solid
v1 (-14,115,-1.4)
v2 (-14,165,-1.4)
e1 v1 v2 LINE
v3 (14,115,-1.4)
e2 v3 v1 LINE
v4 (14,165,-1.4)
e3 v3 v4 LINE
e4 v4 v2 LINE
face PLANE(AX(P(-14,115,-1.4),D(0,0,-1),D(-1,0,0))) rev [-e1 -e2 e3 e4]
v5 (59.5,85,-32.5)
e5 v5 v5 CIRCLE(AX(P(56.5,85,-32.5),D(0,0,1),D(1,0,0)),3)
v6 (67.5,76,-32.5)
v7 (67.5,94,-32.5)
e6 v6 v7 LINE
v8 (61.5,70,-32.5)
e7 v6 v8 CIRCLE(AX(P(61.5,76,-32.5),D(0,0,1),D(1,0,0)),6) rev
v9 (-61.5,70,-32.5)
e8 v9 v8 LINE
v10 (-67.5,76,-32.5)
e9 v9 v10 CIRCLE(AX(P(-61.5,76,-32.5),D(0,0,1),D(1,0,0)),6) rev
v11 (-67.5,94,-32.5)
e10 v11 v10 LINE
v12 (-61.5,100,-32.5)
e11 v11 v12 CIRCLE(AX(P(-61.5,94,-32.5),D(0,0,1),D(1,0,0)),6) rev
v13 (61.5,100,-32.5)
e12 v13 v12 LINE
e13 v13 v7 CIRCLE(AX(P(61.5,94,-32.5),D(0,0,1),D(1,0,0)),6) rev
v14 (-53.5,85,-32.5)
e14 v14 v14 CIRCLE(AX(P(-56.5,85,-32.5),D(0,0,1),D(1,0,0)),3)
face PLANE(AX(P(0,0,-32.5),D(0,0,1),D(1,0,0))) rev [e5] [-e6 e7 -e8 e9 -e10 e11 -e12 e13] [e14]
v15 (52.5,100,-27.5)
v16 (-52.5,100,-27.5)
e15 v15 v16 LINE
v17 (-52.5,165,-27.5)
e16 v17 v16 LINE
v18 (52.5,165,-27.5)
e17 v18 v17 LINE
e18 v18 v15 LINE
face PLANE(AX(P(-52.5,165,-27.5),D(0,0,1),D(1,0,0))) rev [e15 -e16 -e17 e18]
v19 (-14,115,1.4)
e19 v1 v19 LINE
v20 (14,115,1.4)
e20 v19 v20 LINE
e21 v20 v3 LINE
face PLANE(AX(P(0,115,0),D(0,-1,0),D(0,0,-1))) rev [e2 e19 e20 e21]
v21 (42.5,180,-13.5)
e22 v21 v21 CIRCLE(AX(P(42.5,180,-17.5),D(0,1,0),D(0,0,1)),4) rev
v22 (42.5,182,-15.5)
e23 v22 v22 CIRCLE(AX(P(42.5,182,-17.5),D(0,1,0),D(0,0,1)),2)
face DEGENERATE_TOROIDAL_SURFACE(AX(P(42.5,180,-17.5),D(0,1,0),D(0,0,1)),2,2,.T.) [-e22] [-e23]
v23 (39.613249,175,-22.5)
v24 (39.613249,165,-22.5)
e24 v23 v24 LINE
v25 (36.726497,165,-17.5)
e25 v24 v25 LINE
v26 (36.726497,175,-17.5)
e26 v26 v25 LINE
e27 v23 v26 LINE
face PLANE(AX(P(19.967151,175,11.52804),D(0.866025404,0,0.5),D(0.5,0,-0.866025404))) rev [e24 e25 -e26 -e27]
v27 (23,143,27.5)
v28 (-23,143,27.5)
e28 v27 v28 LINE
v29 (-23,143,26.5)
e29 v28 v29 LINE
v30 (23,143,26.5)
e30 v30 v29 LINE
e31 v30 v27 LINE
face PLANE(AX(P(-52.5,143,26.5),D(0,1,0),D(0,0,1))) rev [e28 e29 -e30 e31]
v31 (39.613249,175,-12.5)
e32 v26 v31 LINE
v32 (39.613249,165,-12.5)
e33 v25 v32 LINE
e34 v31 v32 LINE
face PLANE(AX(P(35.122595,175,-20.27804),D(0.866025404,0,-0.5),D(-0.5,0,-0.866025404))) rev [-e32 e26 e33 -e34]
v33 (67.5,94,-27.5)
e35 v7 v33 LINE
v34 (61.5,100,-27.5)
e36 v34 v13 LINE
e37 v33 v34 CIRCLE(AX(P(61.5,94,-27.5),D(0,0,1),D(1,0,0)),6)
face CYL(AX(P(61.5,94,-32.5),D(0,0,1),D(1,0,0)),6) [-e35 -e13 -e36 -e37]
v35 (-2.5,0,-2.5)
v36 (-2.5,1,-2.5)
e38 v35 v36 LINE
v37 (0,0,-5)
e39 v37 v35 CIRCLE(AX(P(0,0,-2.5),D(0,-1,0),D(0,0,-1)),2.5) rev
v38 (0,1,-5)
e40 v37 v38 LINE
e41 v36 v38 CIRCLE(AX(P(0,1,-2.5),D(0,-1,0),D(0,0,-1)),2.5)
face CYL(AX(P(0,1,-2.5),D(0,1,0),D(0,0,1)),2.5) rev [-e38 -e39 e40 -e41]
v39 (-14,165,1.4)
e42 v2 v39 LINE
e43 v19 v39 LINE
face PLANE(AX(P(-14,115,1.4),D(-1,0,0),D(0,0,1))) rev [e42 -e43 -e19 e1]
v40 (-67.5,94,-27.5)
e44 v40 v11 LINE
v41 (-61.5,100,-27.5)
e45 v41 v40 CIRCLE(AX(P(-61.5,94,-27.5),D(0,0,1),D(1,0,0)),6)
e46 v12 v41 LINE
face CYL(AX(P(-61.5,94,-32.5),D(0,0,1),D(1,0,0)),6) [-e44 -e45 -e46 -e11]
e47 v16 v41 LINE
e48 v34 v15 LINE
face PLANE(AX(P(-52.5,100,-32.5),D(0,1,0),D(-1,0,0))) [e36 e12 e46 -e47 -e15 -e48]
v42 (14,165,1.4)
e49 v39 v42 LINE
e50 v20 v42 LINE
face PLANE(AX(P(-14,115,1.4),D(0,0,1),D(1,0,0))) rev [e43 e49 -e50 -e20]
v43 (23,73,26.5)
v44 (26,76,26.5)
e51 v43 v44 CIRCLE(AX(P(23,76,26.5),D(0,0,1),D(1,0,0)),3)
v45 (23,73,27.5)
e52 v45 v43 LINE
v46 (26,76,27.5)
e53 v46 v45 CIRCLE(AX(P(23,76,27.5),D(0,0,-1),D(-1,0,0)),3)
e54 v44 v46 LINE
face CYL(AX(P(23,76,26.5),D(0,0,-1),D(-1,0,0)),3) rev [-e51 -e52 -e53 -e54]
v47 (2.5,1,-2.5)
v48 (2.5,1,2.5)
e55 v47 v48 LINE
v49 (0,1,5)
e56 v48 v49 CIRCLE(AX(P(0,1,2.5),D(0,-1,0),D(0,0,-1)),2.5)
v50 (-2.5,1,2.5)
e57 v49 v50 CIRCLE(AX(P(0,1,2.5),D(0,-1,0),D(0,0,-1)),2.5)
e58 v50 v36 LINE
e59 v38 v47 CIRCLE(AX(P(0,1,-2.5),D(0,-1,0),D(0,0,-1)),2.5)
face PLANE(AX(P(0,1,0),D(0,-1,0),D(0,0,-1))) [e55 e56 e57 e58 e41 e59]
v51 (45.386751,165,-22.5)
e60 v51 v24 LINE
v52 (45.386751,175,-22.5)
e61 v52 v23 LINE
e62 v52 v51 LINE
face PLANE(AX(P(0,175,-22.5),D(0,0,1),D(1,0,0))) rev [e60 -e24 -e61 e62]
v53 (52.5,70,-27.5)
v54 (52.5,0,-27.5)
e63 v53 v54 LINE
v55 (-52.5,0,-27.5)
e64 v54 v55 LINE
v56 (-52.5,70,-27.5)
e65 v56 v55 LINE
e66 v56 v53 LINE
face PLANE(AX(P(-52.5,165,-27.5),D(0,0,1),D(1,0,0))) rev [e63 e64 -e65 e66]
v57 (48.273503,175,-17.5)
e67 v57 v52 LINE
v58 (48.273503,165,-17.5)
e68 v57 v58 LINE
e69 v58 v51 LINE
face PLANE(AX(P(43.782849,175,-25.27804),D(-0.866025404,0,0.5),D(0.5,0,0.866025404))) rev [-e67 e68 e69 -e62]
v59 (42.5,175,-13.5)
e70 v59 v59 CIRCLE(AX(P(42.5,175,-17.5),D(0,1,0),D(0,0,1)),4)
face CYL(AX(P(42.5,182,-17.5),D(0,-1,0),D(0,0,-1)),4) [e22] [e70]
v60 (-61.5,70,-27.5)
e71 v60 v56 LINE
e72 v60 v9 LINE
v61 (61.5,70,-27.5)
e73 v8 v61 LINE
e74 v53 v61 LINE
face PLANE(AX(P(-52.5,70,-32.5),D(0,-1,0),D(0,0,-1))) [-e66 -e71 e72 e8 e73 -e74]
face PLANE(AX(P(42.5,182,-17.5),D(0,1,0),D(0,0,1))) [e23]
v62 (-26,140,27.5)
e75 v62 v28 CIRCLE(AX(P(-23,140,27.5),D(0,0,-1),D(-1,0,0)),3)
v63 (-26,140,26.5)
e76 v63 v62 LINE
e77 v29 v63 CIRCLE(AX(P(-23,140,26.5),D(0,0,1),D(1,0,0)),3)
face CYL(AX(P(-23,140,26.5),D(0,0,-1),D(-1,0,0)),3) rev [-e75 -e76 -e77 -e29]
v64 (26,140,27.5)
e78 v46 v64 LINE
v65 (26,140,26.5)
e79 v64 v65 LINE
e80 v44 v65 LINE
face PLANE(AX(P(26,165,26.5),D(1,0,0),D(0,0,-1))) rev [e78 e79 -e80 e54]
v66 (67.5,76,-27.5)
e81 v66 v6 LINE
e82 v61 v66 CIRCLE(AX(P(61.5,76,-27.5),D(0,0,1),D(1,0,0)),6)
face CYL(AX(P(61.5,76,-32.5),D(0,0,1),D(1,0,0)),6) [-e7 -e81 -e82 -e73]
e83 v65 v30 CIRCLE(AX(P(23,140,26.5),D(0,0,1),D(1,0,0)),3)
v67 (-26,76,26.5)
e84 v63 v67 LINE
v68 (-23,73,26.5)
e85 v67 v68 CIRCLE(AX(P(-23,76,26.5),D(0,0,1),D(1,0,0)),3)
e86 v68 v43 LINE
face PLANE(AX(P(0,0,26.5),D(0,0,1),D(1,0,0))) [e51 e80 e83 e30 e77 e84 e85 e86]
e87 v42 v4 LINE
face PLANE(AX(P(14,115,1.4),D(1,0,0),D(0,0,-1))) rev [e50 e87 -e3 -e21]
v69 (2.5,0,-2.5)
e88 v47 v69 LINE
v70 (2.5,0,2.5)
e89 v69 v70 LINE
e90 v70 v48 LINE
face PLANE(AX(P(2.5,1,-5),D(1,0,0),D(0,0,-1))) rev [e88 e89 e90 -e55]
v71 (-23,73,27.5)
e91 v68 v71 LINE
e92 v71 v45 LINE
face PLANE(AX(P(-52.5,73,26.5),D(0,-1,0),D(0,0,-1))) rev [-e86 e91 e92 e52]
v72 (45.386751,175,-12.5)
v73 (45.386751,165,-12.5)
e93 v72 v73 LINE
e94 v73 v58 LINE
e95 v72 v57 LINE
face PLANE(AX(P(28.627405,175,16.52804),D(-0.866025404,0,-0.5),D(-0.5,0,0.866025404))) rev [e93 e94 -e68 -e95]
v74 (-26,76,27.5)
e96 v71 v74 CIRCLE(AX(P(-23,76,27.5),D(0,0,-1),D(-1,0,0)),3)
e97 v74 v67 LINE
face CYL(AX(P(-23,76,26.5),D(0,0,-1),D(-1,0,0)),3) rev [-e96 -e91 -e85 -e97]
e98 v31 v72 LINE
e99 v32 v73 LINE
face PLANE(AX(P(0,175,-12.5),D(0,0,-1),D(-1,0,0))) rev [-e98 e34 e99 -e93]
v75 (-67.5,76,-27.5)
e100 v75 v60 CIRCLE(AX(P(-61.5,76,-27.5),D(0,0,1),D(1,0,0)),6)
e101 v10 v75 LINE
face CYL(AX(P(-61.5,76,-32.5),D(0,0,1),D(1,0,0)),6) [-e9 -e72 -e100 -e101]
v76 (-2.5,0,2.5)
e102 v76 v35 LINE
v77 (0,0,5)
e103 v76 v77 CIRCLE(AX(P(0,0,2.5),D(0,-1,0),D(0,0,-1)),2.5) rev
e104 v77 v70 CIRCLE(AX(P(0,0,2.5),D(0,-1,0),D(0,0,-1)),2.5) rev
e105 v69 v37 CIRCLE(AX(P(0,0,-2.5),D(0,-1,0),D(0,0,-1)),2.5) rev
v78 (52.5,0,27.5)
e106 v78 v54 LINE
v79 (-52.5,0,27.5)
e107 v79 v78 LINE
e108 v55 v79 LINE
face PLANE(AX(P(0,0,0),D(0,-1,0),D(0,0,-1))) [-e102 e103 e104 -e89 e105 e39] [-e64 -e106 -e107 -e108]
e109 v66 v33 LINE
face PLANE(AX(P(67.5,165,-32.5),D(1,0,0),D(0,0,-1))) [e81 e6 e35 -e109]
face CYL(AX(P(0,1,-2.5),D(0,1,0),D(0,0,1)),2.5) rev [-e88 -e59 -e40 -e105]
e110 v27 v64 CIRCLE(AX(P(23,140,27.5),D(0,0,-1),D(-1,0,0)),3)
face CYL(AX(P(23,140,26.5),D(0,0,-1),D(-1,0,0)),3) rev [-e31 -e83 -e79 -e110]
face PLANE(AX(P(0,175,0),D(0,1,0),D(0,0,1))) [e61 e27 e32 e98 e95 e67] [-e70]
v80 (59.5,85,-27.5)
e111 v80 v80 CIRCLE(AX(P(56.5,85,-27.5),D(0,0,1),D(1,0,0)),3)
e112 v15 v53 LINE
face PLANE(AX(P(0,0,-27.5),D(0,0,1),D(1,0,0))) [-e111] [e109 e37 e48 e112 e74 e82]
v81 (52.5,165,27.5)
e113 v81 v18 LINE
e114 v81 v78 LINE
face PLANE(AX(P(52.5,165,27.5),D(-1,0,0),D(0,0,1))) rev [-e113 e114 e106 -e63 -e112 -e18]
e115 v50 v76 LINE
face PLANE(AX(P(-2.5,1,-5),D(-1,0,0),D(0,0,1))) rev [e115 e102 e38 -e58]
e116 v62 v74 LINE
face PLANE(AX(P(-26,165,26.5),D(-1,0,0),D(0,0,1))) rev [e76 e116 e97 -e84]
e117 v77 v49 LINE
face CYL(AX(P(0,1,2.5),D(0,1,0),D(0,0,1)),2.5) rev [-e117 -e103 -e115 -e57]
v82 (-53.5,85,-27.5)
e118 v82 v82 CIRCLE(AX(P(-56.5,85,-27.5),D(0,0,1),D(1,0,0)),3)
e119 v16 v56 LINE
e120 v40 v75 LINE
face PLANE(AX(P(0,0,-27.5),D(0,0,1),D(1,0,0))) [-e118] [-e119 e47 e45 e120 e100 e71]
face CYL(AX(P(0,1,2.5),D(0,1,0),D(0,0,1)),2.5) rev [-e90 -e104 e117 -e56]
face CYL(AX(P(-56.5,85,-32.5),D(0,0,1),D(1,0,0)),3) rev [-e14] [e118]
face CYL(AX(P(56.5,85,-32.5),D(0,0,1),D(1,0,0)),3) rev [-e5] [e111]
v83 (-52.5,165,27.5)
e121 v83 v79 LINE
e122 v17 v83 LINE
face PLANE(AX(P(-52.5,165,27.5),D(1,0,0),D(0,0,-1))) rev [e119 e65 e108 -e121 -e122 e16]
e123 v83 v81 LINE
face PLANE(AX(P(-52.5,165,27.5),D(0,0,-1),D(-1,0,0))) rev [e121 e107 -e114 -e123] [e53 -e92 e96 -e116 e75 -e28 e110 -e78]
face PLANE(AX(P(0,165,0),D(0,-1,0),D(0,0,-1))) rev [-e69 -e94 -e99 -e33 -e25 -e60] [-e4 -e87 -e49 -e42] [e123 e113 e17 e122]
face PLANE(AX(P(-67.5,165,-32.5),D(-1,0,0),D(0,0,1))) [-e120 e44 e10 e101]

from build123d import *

# Parameters (mm, degrees)
SKETCH1_W           = 105
SKETCH1_H           = 55
BOSS_EXTRUDE1_DEPTH = 165
SKETCH2_W           = 28
SKETCH2_H           = 2.8
CUT_EXTRUDE1_DEPTH  = 50
BOSS_EXTRUDE2_START = 165
BOSS_EXTRUDE2_DEPTH = 10
SKETCH4_R           = 4
BOSS_EXTRUDE3_DEPTH = 7
FILLET1_R           = 2
CUT_EXTRUDE2_START  = 27.5
SKETCH5_W           = 52
SKETCH5_H           = 70
CUT_EXTRUDE2_DEPTH  = 1
SKETCH6_W           = 5
SKETCH6_H           = 10
CUT_EXTRUDE3_DEPTH  = 1
FILLET2_R           = 2.5
BOSS_EXTRUDE4_START = -27.5
SKETCH7_W           = 135
SKETCH7_H           = 30
SKETCH7_R           = 3
BOSS_EXTRUDE4_DEPTH = 5
FILLET3_R           = 6
FILLET4_R           = 3


with BuildPart() as part:
    # Sketch1 → Boss-Extrude1 (new body)
    with BuildSketch(Plane(origin=(0, 0, 0), x_dir=(1, 0, 0), z_dir=(0, 1, 0))):
        Rectangle(SKETCH1_W, SKETCH1_H)
    extrude(amount=BOSS_EXTRUDE1_DEPTH)

    # Sketch2 → Cut-Extrude1 (cut)
    with BuildSketch(Plane(origin=(0, 165, 0), x_dir=(1, 0, 0), z_dir=(0, 1, 0))):
        Rectangle(SKETCH2_W, SKETCH2_H)
    extrude(amount=-CUT_EXTRUDE1_DEPTH, mode=Mode.SUBTRACT)

    # Sketch3 → Boss-Extrude2 (add)
    with BuildSketch(Plane(origin=(0, 0, 0), x_dir=(1, 0, 0), z_dir=(0, 1, 0)).offset(BOSS_EXTRUDE2_START)):
        Polygon((48.273502692, 17.5), (45.386751346, 22.5), (39.613248654, 22.5), (36.726497308, 17.5), (39.613248654, 12.5), (45.386751346, 12.5), align=None)
    extrude(amount=BOSS_EXTRUDE2_DEPTH)

    # Sketch4 → Boss-Extrude3 (add)
    with BuildSketch(Plane(origin=(0, 175, 0), x_dir=(1, 0, 0), z_dir=(0, 1, 0))):
        with Locations(Location((42.5, 17.5, 0), (0, 0, 270))):
            Circle(SKETCH4_R)
    extrude(amount=BOSS_EXTRUDE3_DEPTH)

    # Fillet1
    fillet1_edges = [part.edges().sort_by_distance(p)[0] for p in [
        (42.5, 182, -21.5),
    ]]
    fillet(fillet1_edges, radius=FILLET1_R)

    # Sketch5 → Cut-Extrude2 (cut)
    with BuildSketch(Plane.XY.offset(CUT_EXTRUDE2_START)):
        with Locations((0, 108)):
            Rectangle(SKETCH5_W, SKETCH5_H)
    extrude(amount=-CUT_EXTRUDE2_DEPTH, mode=Mode.SUBTRACT)

    # Sketch6 → Cut-Extrude3 (cut)
    with BuildSketch(Plane(origin=(0, 0, 0), x_dir=(-1, 0, 0), z_dir=(0, -1, 0))):
        Rectangle(SKETCH6_W, SKETCH6_H)
    extrude(amount=-CUT_EXTRUDE3_DEPTH, mode=Mode.SUBTRACT)

    # Fillet2
    fillet2_edges = [part.edges().sort_by_distance(p)[0] for p in [
        (-2.5, 0.5, -5),
        (2.5, 0.5, -5),
        (2.5, 0.5, 5),
        (-2.5, 0.5, 5),
    ]]
    fillet(fillet2_edges, radius=FILLET2_R - 0.0001)  # a hair under: the kernel refuses the full size

    # Sketch7 → Boss-Extrude4 (add)
    with BuildSketch(Plane.XY.offset(BOSS_EXTRUDE4_START)):
        with Locations((0, 85)):
            Rectangle(SKETCH7_W, SKETCH7_H)
        with Locations((-56.5, 85)):
            Circle(SKETCH7_R, mode=Mode.SUBTRACT)
        with Locations((56.5, 85)):
            Circle(SKETCH7_R, mode=Mode.SUBTRACT)
    extrude(amount=-BOSS_EXTRUDE4_DEPTH)

    # Fillet3
    fillet3_edges = [part.edges().sort_by_distance(p)[0] for p in [
        (67.5, 70, -30),
        (-67.5, 70, -30),
        (-67.5, 100, -30),
        (67.5, 100, -30),
    ]]
    fillet(fillet3_edges, radius=FILLET3_R)

    # Fillet4
    fillet4_edges = [part.edges().sort_by_distance(p)[0] for p in [
        (26, 143, 27),
        (26, 73, 27),
        (-26, 73, 27),
        (-26, 143, 27),
    ]]
    fillet(fillet4_edges, radius=FILLET4_R)


solid = part.part
